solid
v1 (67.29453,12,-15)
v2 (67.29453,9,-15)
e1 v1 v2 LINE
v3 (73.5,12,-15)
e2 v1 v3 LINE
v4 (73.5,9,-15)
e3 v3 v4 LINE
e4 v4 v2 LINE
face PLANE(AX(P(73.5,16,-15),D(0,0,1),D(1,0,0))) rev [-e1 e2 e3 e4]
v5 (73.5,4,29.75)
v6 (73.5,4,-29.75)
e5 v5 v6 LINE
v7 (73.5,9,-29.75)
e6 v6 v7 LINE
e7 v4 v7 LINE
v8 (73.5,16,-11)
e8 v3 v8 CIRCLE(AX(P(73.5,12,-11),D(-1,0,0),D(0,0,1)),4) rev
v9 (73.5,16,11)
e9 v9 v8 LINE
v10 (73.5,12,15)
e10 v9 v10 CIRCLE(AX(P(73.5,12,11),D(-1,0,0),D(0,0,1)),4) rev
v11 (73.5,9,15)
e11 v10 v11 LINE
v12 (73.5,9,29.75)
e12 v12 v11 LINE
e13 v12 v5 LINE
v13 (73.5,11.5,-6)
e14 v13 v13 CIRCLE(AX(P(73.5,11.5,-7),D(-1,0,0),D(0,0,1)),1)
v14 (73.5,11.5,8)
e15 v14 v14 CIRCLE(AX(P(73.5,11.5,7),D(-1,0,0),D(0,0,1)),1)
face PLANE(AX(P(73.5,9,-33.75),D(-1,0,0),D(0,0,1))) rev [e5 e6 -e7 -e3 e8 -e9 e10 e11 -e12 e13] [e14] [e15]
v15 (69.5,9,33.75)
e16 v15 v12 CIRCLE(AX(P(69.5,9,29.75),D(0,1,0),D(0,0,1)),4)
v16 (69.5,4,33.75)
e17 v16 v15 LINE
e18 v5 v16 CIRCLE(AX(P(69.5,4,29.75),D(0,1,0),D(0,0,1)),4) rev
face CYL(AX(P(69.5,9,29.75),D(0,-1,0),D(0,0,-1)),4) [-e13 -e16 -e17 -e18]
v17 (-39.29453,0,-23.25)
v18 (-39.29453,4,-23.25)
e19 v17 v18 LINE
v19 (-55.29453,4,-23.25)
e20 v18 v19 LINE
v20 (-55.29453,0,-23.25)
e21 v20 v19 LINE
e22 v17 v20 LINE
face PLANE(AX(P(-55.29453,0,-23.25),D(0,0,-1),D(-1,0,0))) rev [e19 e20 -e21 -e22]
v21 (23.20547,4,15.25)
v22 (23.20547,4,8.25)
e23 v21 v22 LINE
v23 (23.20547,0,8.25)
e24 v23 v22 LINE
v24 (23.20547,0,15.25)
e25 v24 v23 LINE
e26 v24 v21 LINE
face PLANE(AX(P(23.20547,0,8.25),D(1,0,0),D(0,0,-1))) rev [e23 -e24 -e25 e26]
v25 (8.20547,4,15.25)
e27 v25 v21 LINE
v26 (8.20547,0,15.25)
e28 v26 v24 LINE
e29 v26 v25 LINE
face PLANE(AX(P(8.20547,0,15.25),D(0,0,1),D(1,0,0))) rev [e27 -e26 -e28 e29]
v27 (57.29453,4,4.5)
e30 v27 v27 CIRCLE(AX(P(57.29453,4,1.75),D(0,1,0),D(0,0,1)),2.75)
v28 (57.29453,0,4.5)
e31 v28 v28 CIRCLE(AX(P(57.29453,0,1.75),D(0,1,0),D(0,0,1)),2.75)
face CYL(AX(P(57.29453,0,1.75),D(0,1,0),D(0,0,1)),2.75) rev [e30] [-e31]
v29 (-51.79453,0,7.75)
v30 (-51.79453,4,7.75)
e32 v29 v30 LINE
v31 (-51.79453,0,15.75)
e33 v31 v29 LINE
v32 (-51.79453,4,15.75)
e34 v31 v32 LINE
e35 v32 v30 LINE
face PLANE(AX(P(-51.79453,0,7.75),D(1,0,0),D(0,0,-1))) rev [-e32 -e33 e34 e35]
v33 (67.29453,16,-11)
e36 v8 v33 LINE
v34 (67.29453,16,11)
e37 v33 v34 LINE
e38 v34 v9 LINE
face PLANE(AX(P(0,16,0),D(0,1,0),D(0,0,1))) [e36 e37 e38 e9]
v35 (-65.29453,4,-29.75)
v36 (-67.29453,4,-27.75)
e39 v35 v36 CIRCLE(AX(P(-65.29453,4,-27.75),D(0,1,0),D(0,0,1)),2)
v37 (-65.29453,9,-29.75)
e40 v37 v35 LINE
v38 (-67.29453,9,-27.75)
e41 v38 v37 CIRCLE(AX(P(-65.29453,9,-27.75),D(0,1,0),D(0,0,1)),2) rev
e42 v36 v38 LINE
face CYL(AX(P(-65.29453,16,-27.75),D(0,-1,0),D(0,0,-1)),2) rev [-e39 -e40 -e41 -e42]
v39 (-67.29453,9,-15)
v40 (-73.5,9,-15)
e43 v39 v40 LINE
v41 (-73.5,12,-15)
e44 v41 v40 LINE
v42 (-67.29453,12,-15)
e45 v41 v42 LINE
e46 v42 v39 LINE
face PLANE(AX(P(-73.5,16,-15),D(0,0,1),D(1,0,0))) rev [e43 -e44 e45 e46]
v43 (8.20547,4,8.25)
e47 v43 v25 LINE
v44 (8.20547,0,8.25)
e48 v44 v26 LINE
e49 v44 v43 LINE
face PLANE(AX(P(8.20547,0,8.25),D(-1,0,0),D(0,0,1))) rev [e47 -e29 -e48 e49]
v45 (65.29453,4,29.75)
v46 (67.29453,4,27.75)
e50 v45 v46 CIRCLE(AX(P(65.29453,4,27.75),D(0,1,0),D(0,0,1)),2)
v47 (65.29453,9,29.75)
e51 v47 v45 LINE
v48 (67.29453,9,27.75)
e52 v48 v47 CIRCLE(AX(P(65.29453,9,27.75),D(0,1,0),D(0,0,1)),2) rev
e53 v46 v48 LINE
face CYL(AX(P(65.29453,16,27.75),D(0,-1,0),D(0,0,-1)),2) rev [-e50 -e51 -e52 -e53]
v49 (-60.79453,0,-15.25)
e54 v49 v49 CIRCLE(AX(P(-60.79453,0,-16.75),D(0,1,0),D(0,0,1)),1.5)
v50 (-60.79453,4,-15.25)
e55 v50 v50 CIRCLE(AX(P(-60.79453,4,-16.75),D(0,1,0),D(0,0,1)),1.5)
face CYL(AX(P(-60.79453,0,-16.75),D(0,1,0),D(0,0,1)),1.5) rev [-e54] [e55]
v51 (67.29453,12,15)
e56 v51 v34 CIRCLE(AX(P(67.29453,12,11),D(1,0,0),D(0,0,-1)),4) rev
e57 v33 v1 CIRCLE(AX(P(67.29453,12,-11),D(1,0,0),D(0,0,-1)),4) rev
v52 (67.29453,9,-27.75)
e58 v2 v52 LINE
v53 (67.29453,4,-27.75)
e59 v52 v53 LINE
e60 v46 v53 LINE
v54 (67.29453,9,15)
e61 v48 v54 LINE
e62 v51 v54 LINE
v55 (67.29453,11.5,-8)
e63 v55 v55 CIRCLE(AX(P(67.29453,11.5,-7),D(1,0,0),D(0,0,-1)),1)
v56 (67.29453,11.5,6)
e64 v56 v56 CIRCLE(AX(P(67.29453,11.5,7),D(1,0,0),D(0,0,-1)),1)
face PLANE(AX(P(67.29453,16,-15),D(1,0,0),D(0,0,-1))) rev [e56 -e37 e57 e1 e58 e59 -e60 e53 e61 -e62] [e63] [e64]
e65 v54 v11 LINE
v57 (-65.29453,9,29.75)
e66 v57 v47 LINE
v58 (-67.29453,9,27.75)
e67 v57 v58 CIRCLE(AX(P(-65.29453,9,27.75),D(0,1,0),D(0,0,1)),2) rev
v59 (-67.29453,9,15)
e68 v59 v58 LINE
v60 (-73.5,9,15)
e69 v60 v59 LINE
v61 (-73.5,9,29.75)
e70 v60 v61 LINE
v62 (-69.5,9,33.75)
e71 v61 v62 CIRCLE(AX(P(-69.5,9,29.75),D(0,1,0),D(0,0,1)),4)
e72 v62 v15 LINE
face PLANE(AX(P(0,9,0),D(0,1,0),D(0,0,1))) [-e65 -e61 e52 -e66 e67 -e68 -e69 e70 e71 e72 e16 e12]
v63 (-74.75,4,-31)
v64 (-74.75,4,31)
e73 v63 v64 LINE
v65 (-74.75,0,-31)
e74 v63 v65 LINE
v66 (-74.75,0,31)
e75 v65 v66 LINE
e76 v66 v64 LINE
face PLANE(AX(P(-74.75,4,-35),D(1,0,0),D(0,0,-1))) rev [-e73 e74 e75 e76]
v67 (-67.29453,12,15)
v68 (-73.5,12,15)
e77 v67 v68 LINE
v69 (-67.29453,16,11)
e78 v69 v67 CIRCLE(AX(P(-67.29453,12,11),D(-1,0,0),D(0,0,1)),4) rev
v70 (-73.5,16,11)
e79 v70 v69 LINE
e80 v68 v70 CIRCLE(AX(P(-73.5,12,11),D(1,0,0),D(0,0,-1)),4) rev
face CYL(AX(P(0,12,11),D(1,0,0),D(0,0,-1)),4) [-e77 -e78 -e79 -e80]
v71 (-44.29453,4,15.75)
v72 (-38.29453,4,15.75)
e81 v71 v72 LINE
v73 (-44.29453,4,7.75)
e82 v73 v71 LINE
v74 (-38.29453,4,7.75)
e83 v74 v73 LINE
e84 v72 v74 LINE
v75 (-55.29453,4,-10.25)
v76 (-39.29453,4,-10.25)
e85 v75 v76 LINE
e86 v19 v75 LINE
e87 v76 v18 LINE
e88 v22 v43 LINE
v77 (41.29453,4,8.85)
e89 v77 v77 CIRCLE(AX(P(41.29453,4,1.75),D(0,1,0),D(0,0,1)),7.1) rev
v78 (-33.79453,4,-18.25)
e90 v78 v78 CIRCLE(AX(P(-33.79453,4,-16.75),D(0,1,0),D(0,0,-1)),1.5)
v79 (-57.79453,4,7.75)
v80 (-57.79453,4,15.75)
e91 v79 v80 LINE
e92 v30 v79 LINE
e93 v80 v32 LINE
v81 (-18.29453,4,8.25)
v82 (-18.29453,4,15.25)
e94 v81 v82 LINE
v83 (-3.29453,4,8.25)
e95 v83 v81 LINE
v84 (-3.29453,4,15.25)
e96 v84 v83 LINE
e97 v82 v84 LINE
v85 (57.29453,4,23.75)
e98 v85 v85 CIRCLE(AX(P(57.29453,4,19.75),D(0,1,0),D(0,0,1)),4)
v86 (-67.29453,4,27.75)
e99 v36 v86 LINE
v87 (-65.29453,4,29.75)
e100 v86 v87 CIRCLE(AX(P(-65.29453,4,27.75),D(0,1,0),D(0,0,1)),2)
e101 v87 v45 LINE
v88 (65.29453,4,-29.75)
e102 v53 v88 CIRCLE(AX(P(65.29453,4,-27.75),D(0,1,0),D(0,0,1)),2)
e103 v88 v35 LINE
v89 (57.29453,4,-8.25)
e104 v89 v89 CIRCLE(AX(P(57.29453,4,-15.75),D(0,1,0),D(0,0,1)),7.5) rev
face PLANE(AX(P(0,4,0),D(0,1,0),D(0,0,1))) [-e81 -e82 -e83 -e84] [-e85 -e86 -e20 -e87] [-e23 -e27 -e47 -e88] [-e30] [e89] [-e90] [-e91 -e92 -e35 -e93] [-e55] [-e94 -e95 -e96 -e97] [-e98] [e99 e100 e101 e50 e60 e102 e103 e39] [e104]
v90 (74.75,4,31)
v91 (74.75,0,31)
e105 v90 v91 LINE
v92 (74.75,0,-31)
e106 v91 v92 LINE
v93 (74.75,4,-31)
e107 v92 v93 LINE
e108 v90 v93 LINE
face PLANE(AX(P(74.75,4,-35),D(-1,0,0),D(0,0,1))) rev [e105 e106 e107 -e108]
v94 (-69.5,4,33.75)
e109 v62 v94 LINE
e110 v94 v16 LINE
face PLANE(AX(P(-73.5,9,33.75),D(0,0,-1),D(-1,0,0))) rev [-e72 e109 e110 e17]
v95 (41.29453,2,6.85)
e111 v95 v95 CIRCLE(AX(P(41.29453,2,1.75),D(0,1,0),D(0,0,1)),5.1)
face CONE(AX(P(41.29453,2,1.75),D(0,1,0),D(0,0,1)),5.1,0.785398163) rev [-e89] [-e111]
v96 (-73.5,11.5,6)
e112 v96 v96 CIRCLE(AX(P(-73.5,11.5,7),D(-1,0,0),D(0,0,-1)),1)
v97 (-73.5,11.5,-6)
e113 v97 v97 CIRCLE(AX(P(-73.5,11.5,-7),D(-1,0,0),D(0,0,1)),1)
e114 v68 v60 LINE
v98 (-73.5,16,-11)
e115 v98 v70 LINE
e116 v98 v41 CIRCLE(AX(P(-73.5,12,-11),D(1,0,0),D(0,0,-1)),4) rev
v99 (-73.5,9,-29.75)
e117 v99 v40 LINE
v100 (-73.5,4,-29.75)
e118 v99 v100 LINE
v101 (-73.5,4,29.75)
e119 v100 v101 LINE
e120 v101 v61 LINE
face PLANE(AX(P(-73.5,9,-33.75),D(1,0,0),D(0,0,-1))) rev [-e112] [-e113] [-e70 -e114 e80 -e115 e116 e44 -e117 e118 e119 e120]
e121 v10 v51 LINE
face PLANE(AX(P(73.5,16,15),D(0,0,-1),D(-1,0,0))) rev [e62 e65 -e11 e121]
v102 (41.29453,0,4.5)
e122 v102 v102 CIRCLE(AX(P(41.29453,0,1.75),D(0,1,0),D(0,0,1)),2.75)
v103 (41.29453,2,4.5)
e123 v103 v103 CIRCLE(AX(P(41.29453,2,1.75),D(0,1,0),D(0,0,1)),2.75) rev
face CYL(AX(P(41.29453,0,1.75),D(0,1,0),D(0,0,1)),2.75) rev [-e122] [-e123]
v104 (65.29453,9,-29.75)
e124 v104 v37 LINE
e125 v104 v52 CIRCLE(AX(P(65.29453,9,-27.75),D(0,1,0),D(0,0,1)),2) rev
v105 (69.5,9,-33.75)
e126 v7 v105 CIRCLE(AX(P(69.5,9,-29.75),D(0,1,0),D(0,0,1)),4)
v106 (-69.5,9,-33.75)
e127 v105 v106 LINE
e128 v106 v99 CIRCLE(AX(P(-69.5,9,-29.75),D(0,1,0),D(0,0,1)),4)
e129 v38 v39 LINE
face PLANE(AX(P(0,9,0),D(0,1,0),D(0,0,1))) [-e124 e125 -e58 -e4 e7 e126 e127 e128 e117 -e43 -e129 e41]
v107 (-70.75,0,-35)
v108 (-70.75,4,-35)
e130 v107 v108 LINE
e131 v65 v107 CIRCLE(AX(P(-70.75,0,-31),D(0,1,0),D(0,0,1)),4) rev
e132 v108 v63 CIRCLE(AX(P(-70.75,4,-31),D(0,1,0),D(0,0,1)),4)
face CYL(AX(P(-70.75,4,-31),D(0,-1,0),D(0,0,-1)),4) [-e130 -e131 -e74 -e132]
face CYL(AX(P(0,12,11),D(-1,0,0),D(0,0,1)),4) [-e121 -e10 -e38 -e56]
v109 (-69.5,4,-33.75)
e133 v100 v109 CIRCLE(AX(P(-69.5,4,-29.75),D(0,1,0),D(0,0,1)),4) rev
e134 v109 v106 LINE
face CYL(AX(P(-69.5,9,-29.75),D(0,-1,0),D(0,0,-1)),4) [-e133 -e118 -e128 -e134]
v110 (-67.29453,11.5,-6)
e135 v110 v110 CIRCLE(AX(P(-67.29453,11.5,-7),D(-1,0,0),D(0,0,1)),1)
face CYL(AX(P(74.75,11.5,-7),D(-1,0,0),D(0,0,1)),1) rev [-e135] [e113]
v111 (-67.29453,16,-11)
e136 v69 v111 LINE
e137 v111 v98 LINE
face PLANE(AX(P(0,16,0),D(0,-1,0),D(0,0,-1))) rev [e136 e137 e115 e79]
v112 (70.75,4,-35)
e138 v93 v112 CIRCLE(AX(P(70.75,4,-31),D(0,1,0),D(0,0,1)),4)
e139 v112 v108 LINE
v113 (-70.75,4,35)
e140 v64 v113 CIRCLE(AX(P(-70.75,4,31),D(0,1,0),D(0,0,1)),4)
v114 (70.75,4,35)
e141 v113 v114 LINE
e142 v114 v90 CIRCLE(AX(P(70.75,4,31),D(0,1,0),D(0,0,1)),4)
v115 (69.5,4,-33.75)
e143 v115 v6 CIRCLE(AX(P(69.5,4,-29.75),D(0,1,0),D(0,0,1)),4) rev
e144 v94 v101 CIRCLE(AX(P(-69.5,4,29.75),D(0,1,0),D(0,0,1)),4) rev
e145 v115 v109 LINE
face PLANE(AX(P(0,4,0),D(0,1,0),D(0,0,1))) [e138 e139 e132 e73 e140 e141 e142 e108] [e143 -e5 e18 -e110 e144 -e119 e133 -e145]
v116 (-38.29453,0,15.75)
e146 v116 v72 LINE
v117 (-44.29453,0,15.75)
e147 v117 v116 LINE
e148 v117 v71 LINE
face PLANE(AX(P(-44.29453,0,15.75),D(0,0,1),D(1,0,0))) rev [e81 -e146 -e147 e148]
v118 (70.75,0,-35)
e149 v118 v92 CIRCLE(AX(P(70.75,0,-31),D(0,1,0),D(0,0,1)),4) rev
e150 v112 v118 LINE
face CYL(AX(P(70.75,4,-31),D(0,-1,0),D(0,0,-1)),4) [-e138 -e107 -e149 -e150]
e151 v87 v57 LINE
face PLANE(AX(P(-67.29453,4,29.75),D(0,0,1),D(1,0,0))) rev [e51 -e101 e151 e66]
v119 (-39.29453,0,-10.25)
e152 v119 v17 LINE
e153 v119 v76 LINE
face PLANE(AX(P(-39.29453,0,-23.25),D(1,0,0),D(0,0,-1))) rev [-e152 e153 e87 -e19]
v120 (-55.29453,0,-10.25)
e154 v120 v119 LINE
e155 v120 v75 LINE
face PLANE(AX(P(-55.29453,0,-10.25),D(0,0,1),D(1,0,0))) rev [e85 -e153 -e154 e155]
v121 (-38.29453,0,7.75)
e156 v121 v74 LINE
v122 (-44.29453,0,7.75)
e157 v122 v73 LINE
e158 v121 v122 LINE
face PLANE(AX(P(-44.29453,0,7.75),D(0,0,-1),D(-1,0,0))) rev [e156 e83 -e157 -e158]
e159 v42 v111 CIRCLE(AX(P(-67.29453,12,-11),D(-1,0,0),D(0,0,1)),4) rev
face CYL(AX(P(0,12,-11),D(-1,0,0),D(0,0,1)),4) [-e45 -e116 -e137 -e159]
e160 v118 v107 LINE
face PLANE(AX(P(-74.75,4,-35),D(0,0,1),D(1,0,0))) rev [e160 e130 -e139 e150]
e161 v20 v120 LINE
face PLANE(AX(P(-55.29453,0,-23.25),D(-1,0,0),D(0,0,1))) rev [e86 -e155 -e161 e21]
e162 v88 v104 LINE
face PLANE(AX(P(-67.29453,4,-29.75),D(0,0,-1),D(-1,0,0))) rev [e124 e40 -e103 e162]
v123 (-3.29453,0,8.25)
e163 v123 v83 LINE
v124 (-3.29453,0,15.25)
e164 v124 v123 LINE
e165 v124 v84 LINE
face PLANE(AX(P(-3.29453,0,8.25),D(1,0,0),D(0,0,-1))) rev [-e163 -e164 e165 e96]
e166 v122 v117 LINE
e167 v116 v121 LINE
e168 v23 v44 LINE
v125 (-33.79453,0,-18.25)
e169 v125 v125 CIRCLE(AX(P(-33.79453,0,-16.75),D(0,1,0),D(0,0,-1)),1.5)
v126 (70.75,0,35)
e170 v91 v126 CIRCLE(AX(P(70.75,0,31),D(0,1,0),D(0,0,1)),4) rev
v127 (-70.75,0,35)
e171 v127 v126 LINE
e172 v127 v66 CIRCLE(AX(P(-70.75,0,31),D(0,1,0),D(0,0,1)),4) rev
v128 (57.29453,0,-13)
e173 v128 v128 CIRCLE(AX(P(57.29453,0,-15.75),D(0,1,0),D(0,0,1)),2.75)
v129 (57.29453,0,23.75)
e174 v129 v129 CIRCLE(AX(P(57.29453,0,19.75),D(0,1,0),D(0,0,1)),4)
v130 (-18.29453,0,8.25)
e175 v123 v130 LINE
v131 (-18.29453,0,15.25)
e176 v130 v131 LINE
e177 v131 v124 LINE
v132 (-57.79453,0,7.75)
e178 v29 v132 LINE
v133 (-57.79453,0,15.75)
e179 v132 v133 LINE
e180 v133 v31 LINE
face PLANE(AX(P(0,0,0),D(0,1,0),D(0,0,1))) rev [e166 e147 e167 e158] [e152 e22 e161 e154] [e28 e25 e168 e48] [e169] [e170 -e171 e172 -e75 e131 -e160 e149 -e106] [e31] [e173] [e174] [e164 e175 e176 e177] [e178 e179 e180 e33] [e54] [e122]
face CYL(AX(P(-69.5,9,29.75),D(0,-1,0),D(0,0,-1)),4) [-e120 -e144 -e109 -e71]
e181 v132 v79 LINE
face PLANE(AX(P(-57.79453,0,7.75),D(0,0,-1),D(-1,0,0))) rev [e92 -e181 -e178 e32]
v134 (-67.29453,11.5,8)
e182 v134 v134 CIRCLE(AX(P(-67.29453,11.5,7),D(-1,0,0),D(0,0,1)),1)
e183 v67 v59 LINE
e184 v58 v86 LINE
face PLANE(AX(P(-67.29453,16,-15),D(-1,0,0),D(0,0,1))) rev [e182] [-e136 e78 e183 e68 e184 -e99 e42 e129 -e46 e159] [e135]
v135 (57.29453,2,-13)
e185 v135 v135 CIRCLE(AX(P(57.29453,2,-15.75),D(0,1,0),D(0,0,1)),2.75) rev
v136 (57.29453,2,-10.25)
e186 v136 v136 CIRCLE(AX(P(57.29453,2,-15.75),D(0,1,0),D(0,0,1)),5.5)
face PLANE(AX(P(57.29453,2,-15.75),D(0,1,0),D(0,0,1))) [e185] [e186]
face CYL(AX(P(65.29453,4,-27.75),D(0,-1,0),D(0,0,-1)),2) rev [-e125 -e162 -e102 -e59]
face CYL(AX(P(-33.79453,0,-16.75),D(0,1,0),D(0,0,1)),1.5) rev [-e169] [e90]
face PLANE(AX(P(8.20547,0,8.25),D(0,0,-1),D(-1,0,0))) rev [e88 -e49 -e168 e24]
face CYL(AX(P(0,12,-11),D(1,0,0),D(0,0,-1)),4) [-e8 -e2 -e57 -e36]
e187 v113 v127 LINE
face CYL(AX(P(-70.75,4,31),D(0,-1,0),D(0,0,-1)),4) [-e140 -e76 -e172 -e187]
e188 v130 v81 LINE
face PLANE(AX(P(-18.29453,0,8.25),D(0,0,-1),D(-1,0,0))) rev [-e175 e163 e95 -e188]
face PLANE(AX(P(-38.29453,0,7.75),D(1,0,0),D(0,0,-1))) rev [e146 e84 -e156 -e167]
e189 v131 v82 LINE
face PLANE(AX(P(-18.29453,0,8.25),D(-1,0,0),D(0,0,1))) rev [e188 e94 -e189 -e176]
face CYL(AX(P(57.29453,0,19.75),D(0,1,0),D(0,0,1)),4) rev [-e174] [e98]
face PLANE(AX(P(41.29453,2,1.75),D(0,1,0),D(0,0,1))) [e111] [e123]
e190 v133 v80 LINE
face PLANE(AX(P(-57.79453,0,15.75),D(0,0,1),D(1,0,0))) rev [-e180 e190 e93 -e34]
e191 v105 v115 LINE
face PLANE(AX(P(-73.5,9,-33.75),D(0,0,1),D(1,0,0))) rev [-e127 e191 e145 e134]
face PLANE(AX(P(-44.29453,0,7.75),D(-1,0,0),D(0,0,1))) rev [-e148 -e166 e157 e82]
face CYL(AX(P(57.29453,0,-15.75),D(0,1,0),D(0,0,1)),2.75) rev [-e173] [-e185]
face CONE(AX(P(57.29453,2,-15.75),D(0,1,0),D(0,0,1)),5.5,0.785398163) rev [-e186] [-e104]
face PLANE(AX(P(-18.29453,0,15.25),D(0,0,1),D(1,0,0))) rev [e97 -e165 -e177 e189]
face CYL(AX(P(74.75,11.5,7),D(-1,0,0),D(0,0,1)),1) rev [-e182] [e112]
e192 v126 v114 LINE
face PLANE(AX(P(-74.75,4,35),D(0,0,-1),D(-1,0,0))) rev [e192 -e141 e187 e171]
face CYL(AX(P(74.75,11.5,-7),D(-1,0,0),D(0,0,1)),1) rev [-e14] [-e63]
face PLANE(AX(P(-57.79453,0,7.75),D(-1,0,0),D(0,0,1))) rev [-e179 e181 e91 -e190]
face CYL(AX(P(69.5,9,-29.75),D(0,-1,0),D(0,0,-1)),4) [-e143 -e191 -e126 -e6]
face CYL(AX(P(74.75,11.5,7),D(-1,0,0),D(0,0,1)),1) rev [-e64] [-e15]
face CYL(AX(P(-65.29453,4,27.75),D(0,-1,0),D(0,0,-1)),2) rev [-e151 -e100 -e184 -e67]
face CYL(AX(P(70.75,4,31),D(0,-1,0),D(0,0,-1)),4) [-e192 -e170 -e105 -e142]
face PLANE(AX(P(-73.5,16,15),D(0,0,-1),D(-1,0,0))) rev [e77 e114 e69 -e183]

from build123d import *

# Parameters (mm, degrees)
SKETCH1_W           = 149.5
SKETCH1_H           = 70
BOSS_EXTRUDE1_DEPTH = 4
FILLET1_R           = 4
SKETCH6_W           = 147
SKETCH6_H           = 67.5
BOSS_EXTRUDE3_DEPTH = 5
FILLET2_R           = 4
SKETCH7_W           = 6.205469591
SKETCH7_H           = 30
BOSS_EXTRUDE4_DEPTH = 7
SKETCH8_R           = 1
CUT_EXTRUDE3_DEPTH  = 154.163515564
FILLET5_R           = 4
SKETCH9_W           = 134.589060818
SKETCH9_H           = 59.5
CUT_EXTRUDE4_DEPTH  = 5
FILLET7_R           = 2
SKETCH11_R          = 4
CUT_EXTRUDE5_DEPTH  = 84.406009975
SKETCH12_R          = 2.75
CUT_EXTRUDE6_DEPTH  = 84.406009975
SKETCH13_R          = 2.75
CUT_EXTRUDE7_DEPTH  = 84.406009975
SKETCH17_W          = 16
SKETCH17_H          = 13
CUT_EXTRUDE11_DEPTH = 84.406009975
SKETCH18_R          = 3
SKETCH18_W          = 15
SKETCH18_H          = 7
CUT_EXTRUDE12_DEPTH = 84.406009975
SKETCH19_W          = 6
SKETCH19_H          = 8
CUT_EXTRUDE13_DEPTH = 84.406009975
SKETCH20_R          = 1.5
CUT_EXTRUDE14_DEPTH = 84.406009975
SKETCH22_R          = 5.5
CUT_EXTRUDE15_DEPTH = 2
CHAMFER2_SIZE       = 2
SKETCH23_R          = 2.75
CUT_EXTRUDE16_DEPTH = 84.406009975
SKETCH24_R          = 5.1
CUT_EXTRUDE17_DEPTH = 2
CHAMFER3_SIZE       = 2


with BuildPart() as part:
    # Sketch1 → Boss-Extrude1 (new body)
    with BuildSketch(Plane(origin=(0, 0, 0), x_dir=(1, 0, 0), z_dir=(0, 1, 0))):
        Rectangle(SKETCH1_W, SKETCH1_H)
    extrude(amount=BOSS_EXTRUDE1_DEPTH)

    # Fillet1
    fillet1_edges = [part.edges().sort_by_distance(p)[0] for p in [
        (74.75, 2, 35),
        (-74.75, 2, 35),
        (-74.75, 2, -35),
        (74.75, 2, -35),
    ]]
    fillet(fillet1_edges, radius=FILLET1_R)

    # Sketch6 → Boss-Extrude3 (add)
    with BuildSketch(Plane(origin=(0, 4, 0), x_dir=(1, 0, 0), z_dir=(0, 1, 0))):
        Rectangle(SKETCH6_W, SKETCH6_H)
    extrude(amount=BOSS_EXTRUDE3_DEPTH)

    # Fillet2
    fillet2_edges = [part.edges().sort_by_distance(p)[0] for p in [
        (73.5, 6.5, 33.75),
        (73.5, 6.5, -33.75),
        (-73.5, 6.5, -33.75),
        (-73.5, 6.5, 33.75),
    ]]
    fillet(fillet2_edges, radius=FILLET2_R)

    # Sketch7 → Boss-Extrude4 (add)
    with BuildSketch(Plane(origin=(0, 9, 0), x_dir=(1, 0, 0), z_dir=(0, 1, 0))):
        with Locations((-70.397265205, 0)):
            Rectangle(SKETCH7_W, SKETCH7_H)
        with Locations((70.397265205, 0)):
            Rectangle(SKETCH7_W, SKETCH7_H)
    extrude(amount=BOSS_EXTRUDE4_DEPTH)

    # Sketch8 → Cut-Extrude3 (cut, through all)
    with BuildSketch(Plane.ZY.offset(73.5)):
        with Locations((-7, 11.5)):
            Circle(SKETCH8_R)
        with Locations((7, 11.5)):
            Circle(SKETCH8_R)
    extrude(amount=-CUT_EXTRUDE3_DEPTH, mode=Mode.SUBTRACT)

    # Fillet5
    fillet5_edges = [part.edges().sort_by_distance(p)[0] for p in [
        (-70.397265204, 16, 15),
        (-70.397265204, 16, -15),
        (70.397265204, 16, -15),
        (70.397265204, 16, 15),
    ]]
    fillet(fillet5_edges, radius=FILLET5_R)

    # Sketch9 → Cut-Extrude4 (cut)
    with BuildSketch(Plane(origin=(0, 9, 0), x_dir=(1, 0, 0), z_dir=(0, 1, 0))):
        Rectangle(SKETCH9_W, SKETCH9_H)
    extrude(amount=-CUT_EXTRUDE4_DEPTH, mode=Mode.SUBTRACT)

    # Fillet7
    fillet7_edges = [part.edges().sort_by_distance(p)[0] for p in [
        (67.294530409, 6.5, -29.75),
        (67.294530409, 6.5, 29.75),
        (-67.294530409, 6.5, 29.75),
        (-67.294530409, 6.5, -29.75),
    ]]
    fillet(fillet7_edges, radius=FILLET7_R)

    # Sketch11 → Cut-Extrude5 (cut, through all)
    with BuildSketch(Plane(origin=(0, 4, 0), x_dir=(1, 0, 0), z_dir=(0, 1, 0))):
        with Locations(Location((57.294530409, -19.75, 0), (0, 0, 270))):
            Circle(SKETCH11_R)
    extrude(amount=-CUT_EXTRUDE5_DEPTH, mode=Mode.SUBTRACT)

    # Sketch12 → Cut-Extrude6 (cut, through all)
    with BuildSketch(Plane(origin=(0, 4, 0), x_dir=(1, 0, 0), z_dir=(0, 1, 0))):
        with Locations(Location((57.294530409, -1.75, 0), (0, 0, 270))):
            Circle(SKETCH12_R)
    extrude(amount=-CUT_EXTRUDE6_DEPTH, mode=Mode.SUBTRACT)

    # Sketch13 → Cut-Extrude7 (cut, through all)
    with BuildSketch(Plane(origin=(0, 4, 0), x_dir=(1, 0, 0), z_dir=(0, 1, 0))):
        with Locations(Location((57.294530409, 15.75, 0), (0, 0, 270))):
            Circle(SKETCH13_R)
    extrude(amount=-CUT_EXTRUDE7_DEPTH, mode=Mode.SUBTRACT)

    # Sketch17 → Cut-Extrude11 (cut, through all)
    with BuildSketch(Plane(origin=(0, 4, 0), x_dir=(1, 0, 0), z_dir=(0, 1, 0))):
        with Locations((-47.294530409, 16.75)):
            Rectangle(SKETCH17_W, SKETCH17_H)
    extrude(amount=-CUT_EXTRUDE11_DEPTH, mode=Mode.SUBTRACT)

    # Sketch18 → Cut-Extrude12 (cut, through all)
    with BuildSketch(Plane(origin=(0, 4, 0), x_dir=(1, 0, 0), z_dir=(0, 1, 0))):
        with Locations(Location((-41.294530409, -11.75, 0), (0, 0, 270))):
            Circle(SKETCH18_R)
        with Locations(Location((-54.794530409, -11.75, 0), (0, 0, 270))):
            Circle(SKETCH18_R)
        with Locations((15.705469591, -11.75)):
            Rectangle(SKETCH18_W, SKETCH18_H)
        with Locations((-10.794530409, -11.75)):
            Rectangle(SKETCH18_W, SKETCH18_H)
    extrude(amount=-CUT_EXTRUDE12_DEPTH, mode=Mode.SUBTRACT)

    # Sketch19 → Cut-Extrude13 (cut, through all)
    with BuildSketch(Plane(origin=(0, 4, 0), x_dir=(1, 0, 0), z_dir=(0, 1, 0))):
        with Locations((-41.294530409, -11.75)):
            Rectangle(SKETCH19_W, SKETCH19_H)
        with Locations((-54.794530409, -11.75)):
            Rectangle(SKETCH19_W, SKETCH19_H)
    extrude(amount=-CUT_EXTRUDE13_DEPTH, mode=Mode.SUBTRACT)

    # Sketch20 → Cut-Extrude14 (cut, through all)
    with BuildSketch(Plane(origin=(0, 4, 0), x_dir=(1, 0, 0), z_dir=(0, 1, 0))):
        with Locations(Location((-60.794530409, 16.75, 0), (0, 0, 270))):
            Circle(SKETCH20_R)
        with Locations(Location((-33.794530409, 16.75, 0), (0, 0, 90))):
            Circle(SKETCH20_R)
    extrude(amount=-CUT_EXTRUDE14_DEPTH, mode=Mode.SUBTRACT)

    # Sketch22 → Cut-Extrude15 (cut)
    with BuildSketch(Plane(origin=(0, 4, 0), x_dir=(1, 0, 0), z_dir=(0, 1, 0))):
        with Locations(Location((57.294530409, 15.75, 0), (0, 0, 270))):
            Circle(SKETCH22_R)
    extrude(amount=-CUT_EXTRUDE15_DEPTH, mode=Mode.SUBTRACT)

    # Chamfer2
    chamfer2_edges = [part.edges().sort_by_distance(p)[0] for p in [
        (57.294530409, 4, -21.25),
    ]]
    chamfer(chamfer2_edges, length=CHAMFER2_SIZE - 0.0001)  # a hair under: the kernel refuses the full size

    # Sketch23 → Cut-Extrude16 (cut, through all)
    with BuildSketch(Plane(origin=(0, 4, 0), x_dir=(1, 0, 0), z_dir=(0, 1, 0))):
        with Locations(Location((41.294530409, -1.75, 0), (0, 0, 270))):
            Circle(SKETCH23_R)
    extrude(amount=-CUT_EXTRUDE16_DEPTH, mode=Mode.SUBTRACT)

    # Sketch24 → Cut-Extrude17 (cut)
    with BuildSketch(Plane(origin=(0, 4, 0), x_dir=(1, 0, 0), z_dir=(0, 1, 0))):
        with Locations(Location((41.294530409, -1.75, 0), (0, 0, 270))):
            Circle(SKETCH24_R)
    extrude(amount=-CUT_EXTRUDE17_DEPTH, mode=Mode.SUBTRACT)

    # Chamfer3
    chamfer3_edges = [part.edges().sort_by_distance(p)[0] for p in [
        (41.294530409, 4, -3.35),
    ]]
    chamfer(chamfer3_edges, length=CHAMFER3_SIZE - 0.0001)  # a hair under: the kernel refuses the full size


solid = part.part
